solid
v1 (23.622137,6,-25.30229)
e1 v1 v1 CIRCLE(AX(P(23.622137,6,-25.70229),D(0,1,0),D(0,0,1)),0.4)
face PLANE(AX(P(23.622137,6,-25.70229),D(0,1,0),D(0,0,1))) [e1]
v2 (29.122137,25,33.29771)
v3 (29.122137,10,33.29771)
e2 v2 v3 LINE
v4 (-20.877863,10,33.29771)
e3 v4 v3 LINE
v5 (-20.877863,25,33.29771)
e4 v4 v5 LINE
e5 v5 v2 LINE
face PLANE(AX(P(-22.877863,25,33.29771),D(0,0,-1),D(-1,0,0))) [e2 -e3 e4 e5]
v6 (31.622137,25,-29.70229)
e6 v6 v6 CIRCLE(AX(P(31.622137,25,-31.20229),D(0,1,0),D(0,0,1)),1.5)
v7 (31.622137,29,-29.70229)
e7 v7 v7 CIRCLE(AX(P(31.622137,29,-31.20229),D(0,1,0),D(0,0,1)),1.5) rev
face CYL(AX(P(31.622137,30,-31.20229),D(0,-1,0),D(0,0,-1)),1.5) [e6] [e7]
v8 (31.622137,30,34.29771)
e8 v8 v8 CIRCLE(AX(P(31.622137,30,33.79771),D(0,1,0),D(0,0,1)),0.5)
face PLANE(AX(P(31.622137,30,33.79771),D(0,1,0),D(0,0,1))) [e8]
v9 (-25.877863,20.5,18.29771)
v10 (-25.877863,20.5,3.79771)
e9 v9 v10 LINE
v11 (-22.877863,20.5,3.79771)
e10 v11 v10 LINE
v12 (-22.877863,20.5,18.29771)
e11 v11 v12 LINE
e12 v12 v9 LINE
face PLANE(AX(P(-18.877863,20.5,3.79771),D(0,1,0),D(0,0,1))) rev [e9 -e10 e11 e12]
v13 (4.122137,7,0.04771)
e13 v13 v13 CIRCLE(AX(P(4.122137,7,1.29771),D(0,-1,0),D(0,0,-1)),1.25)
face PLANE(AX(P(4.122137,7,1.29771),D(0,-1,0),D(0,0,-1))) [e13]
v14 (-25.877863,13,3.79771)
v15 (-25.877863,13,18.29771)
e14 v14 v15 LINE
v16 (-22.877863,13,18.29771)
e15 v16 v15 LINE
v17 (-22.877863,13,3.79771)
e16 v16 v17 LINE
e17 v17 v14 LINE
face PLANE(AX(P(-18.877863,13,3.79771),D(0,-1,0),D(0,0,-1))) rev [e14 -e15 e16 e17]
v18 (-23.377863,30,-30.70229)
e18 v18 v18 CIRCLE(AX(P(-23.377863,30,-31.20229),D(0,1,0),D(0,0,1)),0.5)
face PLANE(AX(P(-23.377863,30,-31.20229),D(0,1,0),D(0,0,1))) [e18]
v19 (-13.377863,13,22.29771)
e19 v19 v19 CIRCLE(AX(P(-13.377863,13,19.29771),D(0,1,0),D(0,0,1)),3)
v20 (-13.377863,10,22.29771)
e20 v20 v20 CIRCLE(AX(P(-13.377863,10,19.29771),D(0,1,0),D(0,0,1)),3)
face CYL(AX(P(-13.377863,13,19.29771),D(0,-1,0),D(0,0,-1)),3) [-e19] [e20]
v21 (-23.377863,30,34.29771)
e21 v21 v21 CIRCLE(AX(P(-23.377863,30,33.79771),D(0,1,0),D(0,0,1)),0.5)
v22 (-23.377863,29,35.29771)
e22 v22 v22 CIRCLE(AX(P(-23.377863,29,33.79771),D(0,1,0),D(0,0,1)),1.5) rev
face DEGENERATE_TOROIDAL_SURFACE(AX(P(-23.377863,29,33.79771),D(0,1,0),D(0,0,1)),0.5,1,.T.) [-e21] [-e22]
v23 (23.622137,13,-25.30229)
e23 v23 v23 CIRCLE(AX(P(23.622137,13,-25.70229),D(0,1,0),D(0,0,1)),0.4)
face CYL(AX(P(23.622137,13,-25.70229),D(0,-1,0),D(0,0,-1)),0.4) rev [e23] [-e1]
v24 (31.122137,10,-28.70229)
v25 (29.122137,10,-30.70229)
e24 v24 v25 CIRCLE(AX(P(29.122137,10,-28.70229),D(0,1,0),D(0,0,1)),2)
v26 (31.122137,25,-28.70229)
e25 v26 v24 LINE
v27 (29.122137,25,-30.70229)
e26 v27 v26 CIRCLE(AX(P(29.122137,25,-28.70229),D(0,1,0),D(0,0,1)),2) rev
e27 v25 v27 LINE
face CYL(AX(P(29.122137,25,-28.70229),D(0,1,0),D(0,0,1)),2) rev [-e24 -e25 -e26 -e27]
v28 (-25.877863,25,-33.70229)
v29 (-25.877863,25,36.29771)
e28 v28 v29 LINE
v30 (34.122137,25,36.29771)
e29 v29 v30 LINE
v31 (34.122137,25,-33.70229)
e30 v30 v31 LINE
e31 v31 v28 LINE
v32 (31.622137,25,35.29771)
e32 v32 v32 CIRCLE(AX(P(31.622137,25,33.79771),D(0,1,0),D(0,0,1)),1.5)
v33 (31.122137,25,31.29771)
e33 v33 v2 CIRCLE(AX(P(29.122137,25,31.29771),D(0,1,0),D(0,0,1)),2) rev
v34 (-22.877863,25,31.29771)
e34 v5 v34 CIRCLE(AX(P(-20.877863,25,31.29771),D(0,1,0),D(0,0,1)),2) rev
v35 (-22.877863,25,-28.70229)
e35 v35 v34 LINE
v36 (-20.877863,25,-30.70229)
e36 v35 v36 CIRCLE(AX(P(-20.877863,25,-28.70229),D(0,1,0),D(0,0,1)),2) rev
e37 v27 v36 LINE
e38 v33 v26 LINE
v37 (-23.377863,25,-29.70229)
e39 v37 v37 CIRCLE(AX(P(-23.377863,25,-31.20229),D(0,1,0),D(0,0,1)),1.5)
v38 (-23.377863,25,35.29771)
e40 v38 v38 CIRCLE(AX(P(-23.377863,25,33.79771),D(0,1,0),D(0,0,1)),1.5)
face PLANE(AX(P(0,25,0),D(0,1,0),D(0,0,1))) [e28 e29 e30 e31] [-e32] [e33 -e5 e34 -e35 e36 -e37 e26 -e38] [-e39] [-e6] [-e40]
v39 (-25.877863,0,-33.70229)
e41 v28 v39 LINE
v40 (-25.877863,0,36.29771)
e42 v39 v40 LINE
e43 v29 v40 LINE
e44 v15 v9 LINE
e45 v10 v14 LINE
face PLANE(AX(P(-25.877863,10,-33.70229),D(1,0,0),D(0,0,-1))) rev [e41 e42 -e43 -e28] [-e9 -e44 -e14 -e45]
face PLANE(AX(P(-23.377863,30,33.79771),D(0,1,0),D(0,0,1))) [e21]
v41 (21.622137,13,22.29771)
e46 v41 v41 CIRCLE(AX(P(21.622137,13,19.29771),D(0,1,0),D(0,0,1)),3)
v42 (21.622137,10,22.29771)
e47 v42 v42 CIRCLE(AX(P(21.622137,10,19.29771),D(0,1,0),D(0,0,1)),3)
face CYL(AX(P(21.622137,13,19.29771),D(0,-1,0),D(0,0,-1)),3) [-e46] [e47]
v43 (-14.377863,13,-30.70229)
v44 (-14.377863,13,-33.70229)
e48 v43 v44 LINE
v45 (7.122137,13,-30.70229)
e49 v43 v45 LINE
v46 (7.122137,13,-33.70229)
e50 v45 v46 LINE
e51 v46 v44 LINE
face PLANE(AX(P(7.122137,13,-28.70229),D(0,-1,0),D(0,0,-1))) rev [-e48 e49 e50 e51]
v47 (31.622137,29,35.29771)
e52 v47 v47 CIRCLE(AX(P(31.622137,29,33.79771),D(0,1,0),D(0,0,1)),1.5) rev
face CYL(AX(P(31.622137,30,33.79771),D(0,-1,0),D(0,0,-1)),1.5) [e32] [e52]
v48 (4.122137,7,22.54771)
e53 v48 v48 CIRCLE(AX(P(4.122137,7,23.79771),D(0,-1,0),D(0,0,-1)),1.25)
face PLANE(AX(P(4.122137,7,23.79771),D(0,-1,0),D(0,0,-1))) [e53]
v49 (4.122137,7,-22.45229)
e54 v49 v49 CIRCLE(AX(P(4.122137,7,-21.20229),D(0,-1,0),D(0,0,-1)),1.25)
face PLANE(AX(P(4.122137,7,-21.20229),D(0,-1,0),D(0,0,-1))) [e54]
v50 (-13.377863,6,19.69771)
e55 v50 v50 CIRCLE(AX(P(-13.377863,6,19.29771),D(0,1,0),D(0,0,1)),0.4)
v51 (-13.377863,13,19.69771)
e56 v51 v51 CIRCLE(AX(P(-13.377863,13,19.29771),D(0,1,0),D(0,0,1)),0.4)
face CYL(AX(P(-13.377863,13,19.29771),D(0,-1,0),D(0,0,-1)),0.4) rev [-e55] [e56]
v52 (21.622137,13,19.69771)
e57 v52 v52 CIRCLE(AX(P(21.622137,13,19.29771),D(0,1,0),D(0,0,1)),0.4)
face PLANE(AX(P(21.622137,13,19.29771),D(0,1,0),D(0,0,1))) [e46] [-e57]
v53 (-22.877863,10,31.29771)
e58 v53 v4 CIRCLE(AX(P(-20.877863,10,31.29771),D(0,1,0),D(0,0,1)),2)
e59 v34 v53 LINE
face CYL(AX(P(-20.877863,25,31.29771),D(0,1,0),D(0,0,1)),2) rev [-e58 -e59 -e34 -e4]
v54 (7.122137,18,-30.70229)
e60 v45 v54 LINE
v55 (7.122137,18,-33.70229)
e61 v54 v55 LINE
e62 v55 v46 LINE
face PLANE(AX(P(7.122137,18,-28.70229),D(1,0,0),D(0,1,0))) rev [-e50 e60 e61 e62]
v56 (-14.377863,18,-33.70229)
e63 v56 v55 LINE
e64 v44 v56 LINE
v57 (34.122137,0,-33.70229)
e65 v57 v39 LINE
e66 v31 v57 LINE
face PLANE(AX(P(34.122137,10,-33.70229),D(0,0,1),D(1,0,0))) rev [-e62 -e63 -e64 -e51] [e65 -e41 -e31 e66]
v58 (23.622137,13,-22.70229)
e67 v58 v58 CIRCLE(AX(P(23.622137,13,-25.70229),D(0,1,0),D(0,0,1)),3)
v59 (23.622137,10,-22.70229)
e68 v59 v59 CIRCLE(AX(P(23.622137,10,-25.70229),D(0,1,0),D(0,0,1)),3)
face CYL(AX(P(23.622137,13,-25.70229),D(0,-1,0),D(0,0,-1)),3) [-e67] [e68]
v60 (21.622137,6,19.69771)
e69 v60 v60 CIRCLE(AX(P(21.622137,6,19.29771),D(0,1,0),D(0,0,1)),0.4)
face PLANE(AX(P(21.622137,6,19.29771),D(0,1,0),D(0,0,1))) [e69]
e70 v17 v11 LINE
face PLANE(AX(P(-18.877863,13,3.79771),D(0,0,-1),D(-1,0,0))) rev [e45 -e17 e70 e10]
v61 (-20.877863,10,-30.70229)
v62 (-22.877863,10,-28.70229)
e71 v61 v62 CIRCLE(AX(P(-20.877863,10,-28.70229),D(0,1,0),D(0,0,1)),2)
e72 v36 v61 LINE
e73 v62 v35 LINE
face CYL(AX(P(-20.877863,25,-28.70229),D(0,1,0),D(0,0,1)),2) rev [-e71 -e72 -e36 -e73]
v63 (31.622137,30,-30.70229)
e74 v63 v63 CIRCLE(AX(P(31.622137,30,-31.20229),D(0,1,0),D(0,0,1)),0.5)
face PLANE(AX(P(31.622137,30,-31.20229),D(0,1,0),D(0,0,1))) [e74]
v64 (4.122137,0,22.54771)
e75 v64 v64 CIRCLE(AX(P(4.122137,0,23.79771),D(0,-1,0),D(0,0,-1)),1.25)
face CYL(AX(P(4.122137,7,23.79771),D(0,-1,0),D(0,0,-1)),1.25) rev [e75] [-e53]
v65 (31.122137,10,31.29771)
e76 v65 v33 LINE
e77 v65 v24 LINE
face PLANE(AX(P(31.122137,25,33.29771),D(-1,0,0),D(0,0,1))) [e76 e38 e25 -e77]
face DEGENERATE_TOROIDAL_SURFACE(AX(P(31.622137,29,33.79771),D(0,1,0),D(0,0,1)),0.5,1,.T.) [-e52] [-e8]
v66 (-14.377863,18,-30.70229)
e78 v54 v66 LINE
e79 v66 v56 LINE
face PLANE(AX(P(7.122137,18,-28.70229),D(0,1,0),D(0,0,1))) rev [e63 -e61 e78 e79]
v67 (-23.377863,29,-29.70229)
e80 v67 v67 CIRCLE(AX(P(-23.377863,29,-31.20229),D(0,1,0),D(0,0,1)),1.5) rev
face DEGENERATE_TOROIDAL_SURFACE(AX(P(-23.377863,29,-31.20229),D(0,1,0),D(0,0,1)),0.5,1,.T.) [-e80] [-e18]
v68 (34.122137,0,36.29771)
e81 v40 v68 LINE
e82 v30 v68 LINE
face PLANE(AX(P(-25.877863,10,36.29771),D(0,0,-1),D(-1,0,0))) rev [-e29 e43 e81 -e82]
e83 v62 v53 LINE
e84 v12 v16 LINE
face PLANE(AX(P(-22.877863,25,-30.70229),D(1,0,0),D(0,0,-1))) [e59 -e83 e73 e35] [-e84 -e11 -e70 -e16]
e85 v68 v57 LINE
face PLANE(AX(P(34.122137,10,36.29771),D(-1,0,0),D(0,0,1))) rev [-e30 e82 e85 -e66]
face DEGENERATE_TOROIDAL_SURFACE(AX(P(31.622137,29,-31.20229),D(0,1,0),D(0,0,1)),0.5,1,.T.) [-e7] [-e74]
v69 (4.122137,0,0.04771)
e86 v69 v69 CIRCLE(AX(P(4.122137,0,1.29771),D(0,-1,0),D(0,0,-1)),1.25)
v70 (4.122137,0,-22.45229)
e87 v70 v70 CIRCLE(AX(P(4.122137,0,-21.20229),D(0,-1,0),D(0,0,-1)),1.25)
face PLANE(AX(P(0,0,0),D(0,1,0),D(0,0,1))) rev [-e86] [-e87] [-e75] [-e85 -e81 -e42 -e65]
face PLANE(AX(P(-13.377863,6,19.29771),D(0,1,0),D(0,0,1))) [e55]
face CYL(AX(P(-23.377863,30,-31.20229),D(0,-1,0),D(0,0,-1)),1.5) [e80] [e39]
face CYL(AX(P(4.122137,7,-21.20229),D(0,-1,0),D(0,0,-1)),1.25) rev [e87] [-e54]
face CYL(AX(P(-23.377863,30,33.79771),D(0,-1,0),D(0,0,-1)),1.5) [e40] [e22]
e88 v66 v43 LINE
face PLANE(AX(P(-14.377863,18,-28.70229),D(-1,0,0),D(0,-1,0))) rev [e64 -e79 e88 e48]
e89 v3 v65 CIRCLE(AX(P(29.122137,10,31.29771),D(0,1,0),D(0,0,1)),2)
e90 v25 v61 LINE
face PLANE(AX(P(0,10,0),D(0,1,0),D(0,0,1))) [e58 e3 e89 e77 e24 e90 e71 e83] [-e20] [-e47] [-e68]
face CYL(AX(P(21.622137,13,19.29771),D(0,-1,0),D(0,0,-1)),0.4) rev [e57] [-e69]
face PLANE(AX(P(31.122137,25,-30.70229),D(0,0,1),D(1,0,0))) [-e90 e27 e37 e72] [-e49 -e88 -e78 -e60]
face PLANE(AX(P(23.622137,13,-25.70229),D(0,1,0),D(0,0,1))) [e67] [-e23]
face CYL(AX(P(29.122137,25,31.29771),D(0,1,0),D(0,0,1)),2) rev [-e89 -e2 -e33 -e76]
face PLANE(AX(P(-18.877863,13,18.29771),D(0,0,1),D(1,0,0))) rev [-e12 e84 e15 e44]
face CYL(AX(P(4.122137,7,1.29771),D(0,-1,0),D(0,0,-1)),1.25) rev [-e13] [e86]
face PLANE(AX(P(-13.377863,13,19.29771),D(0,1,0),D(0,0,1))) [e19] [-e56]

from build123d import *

# Parameters (mm, degrees)
SKETCH1_W           = 60
SKETCH1_H           = 70
BOSS_EXTRUDE1_DEPTH = 10
SKETCH2_W           = 60
SKETCH2_H           = 70
SKETCH2_W_2         = 54
SKETCH2_H_2         = 64
BOSS_EXTRUDE2_DEPTH = 15
SKETCH3_R           = 1.5
BOSS_EXTRUDE3_DEPTH = 5
SKETCH8_R           = 3
SKETCH8_R_2         = 0.4
BOSS_EXTRUDE4_DEPTH = 3
CUT_EXTRUDE1_START  = -4
SKETCH11_R          = 0.4
CUT_EXTRUDE1_DEPTH  = 4
SKETCH12_W          = 21.5
SKETCH12_H          = 5
CUT_EXTRUDE2_DEPTH  = 5
FILLET2_R           = 1
SKETCH18_R          = 1.25
CUT_EXTRUDE6_DEPTH  = 7
SKETCH20_W          = 14.5
SKETCH20_H          = 7.5
CUT_EXTRUDE7_DEPTH  = 7
FILLET3_R           = 2


with BuildPart() as part:
    # Sketch1 → Boss-Extrude1 (new body)
    with BuildSketch(Plane(origin=(0, 0, 0), x_dir=(1, 0, 0), z_dir=(0, 1, 0))):
        with Locations((4.122137405, -1.297709924)):
            Rectangle(SKETCH1_W, SKETCH1_H)
    extrude(amount=BOSS_EXTRUDE1_DEPTH)

    # Sketch2 → Boss-Extrude2 (add)
    with BuildSketch(Plane(origin=(0, 10, 0), x_dir=(1, 0, 0), z_dir=(0, 1, 0))):
        with Locations((4.122137405, -1.297709924)):
            Rectangle(SKETCH2_W, SKETCH2_H)
        with Locations((4.122137405, -1.297709924)):
            Rectangle(SKETCH2_W_2, SKETCH2_H_2, mode=Mode.SUBTRACT)
    extrude(amount=BOSS_EXTRUDE2_DEPTH)

    # Sketch3 → Boss-Extrude3 (add)
    with BuildSketch(Plane(origin=(0, 25, 0), x_dir=(1, 0, 0), z_dir=(0, 1, 0))):
        with Locations(Location((-23.377862595, 31.202290076, 0), (0, 0, 340.528779366))):
            Circle(SKETCH3_R)
        with Locations(Location((31.622137405, 31.202290076, 0), (0, 0, 199.471220634))):
            Circle(SKETCH3_R)
        with Locations(Location((31.622137405, -33.797709924, 0), (0, 0, 109.471220634))):
            Circle(SKETCH3_R)
        with Locations(Location((-23.377862595, -33.797709924, 0), (0, 0, 70.528779366))):
            Circle(SKETCH3_R)
    extrude(amount=BOSS_EXTRUDE3_DEPTH)

    # Sketch8 → Boss-Extrude4 (add)
    # profile 1 of 3: a face of its own
    with BuildSketch(Plane(origin=(0, 10, 0), x_dir=(1, 0, 0), z_dir=(0, 1, 0))):
        with Locations(Location((21.622137405, -19.297709924, 0), (0, 0, 270))):
            Circle(SKETCH8_R)
        with Locations(Location((21.622137405, -19.297709924, 0), (0, 0, 270))):
            Circle(SKETCH8_R_2, mode=Mode.SUBTRACT)
    # profile 2 of 3: a face of its own
    with BuildSketch(Plane(origin=(0, 10, 0), x_dir=(1, 0, 0), z_dir=(0, 1, 0))):
        with Locations(Location((-13.377862595, -19.297709924, 0), (0, 0, 270))):
            Circle(SKETCH8_R)
        with Locations(Location((-13.377862595, -19.297709924, 0), (0, 0, 270))):
            Circle(SKETCH8_R_2, mode=Mode.SUBTRACT)
    # profile 3 of 3: a face of its own
    with BuildSketch(Plane(origin=(0, 10, 0), x_dir=(1, 0, 0), z_dir=(0, 1, 0))):
        with Locations(Location((23.622137405, 25.702290076, 0), (0, 0, 270))):
            Circle(SKETCH8_R)
        with Locations(Location((23.622137405, 25.702290076, 0), (0, 0, 270))):
            Circle(SKETCH8_R_2, mode=Mode.SUBTRACT)
    extrude(amount=BOSS_EXTRUDE4_DEPTH)

    # Sketch11 → Cut-Extrude1 (cut)
    with BuildSketch(Plane(origin=(0, 10, 0), x_dir=(1, 0, 0), z_dir=(0, 1, 0)).offset(CUT_EXTRUDE1_START)):
        with Locations(Location((-13.377862595, -19.297709924, 0), (0, 0, 270))):
            Circle(SKETCH11_R)
        with Locations(Location((21.622137405, -19.297709924, 0), (0, 0, 270))):
            Circle(SKETCH11_R)
        with Locations(Location((23.622137405, 25.702290076, 0), (0, 0, 270))):
            Circle(SKETCH11_R)
    extrude(amount=CUT_EXTRUDE1_DEPTH, mode=Mode.SUBTRACT)

    # Sketch12 → Cut-Extrude2 (cut)
    with BuildSketch(Plane(origin=(0, 0, -33.702290076), x_dir=(-1, 0, 0), z_dir=(0, 0, -1))):
        with Locations((3.627862595, 15.5)):
            Rectangle(SKETCH12_W, SKETCH12_H)
    extrude(amount=-CUT_EXTRUDE2_DEPTH, mode=Mode.SUBTRACT)

    # Fillet2
    fillet2_edges = [part.edges().sort_by_distance(p)[0] for p in [
        (-24.792076158, 30, -31.702290076),
        (33.036350967, 30, -31.702290076),
        (32.122137405, 30, 35.211923486),
        (-23.877862595, 30, 35.211923486),
    ]]
    fillet(fillet2_edges, radius=FILLET2_R)

    # Sketch18 → Cut-Extrude6 (cut)
    with BuildSketch(Plane.XZ):
        with Locations(Location((4.122137405, 23.797709924, 0), (0, 0, 270))):
            Circle(SKETCH18_R)
        with Locations(Location((4.122137405, 1.297709924, 0), (0, 0, 270))):
            Circle(SKETCH18_R)
        with Locations(Location((4.122137405, -21.202290076, 0), (0, 0, 270))):
            Circle(SKETCH18_R)
    extrude(amount=-CUT_EXTRUDE6_DEPTH, mode=Mode.SUBTRACT)

    # Sketch20 → Cut-Extrude7 (cut)
    with BuildSketch(Plane.ZY.offset(25.877862595)):
        with Locations((11.047709924, 16.75)):
            Rectangle(SKETCH20_W, SKETCH20_H)
    extrude(amount=-CUT_EXTRUDE7_DEPTH, mode=Mode.SUBTRACT)

    # Fillet3
    # the kernel refuses this fillet: 2 mm, written as the material it adds along each edge
    with BuildSketch(Plane(origin=(-22.877862595, 5, -30.702290076), x_dir=(0, 0, 1), z_dir=(0, 1, 0)), Plane(origin=(31.122137405, 5, -30.702290076), x_dir=(-1, 0, 0), z_dir=(0, 1, 0))) as fillet3_piece_1:
        with BuildLine():
            CenterArc((FILLET3_R, FILLET3_R), FILLET3_R, 180, 90)
            Line((0, FILLET3_R), (0, 0))
            Line((0, 0), (FILLET3_R, 0))
        make_face()
    extrude(amount=20)
    with BuildSketch(Plane(origin=(-22.877862595, 5, 33.297709924), x_dir=(0, 0, -1), z_dir=(0, 1, 0)), Plane(origin=(31.122137405, 5, 33.297709924), x_dir=(-1, 0, 0), z_dir=(0, 1, 0))) as fillet3_piece_2:
        with BuildLine():
            CenterArc((FILLET3_R, -FILLET3_R), FILLET3_R, 90, 90)
            Line((0, -FILLET3_R), (0, 0))
            Line((0, 0), (FILLET3_R, 0))
        make_face()
    extrude(amount=20)


solid = part.part
